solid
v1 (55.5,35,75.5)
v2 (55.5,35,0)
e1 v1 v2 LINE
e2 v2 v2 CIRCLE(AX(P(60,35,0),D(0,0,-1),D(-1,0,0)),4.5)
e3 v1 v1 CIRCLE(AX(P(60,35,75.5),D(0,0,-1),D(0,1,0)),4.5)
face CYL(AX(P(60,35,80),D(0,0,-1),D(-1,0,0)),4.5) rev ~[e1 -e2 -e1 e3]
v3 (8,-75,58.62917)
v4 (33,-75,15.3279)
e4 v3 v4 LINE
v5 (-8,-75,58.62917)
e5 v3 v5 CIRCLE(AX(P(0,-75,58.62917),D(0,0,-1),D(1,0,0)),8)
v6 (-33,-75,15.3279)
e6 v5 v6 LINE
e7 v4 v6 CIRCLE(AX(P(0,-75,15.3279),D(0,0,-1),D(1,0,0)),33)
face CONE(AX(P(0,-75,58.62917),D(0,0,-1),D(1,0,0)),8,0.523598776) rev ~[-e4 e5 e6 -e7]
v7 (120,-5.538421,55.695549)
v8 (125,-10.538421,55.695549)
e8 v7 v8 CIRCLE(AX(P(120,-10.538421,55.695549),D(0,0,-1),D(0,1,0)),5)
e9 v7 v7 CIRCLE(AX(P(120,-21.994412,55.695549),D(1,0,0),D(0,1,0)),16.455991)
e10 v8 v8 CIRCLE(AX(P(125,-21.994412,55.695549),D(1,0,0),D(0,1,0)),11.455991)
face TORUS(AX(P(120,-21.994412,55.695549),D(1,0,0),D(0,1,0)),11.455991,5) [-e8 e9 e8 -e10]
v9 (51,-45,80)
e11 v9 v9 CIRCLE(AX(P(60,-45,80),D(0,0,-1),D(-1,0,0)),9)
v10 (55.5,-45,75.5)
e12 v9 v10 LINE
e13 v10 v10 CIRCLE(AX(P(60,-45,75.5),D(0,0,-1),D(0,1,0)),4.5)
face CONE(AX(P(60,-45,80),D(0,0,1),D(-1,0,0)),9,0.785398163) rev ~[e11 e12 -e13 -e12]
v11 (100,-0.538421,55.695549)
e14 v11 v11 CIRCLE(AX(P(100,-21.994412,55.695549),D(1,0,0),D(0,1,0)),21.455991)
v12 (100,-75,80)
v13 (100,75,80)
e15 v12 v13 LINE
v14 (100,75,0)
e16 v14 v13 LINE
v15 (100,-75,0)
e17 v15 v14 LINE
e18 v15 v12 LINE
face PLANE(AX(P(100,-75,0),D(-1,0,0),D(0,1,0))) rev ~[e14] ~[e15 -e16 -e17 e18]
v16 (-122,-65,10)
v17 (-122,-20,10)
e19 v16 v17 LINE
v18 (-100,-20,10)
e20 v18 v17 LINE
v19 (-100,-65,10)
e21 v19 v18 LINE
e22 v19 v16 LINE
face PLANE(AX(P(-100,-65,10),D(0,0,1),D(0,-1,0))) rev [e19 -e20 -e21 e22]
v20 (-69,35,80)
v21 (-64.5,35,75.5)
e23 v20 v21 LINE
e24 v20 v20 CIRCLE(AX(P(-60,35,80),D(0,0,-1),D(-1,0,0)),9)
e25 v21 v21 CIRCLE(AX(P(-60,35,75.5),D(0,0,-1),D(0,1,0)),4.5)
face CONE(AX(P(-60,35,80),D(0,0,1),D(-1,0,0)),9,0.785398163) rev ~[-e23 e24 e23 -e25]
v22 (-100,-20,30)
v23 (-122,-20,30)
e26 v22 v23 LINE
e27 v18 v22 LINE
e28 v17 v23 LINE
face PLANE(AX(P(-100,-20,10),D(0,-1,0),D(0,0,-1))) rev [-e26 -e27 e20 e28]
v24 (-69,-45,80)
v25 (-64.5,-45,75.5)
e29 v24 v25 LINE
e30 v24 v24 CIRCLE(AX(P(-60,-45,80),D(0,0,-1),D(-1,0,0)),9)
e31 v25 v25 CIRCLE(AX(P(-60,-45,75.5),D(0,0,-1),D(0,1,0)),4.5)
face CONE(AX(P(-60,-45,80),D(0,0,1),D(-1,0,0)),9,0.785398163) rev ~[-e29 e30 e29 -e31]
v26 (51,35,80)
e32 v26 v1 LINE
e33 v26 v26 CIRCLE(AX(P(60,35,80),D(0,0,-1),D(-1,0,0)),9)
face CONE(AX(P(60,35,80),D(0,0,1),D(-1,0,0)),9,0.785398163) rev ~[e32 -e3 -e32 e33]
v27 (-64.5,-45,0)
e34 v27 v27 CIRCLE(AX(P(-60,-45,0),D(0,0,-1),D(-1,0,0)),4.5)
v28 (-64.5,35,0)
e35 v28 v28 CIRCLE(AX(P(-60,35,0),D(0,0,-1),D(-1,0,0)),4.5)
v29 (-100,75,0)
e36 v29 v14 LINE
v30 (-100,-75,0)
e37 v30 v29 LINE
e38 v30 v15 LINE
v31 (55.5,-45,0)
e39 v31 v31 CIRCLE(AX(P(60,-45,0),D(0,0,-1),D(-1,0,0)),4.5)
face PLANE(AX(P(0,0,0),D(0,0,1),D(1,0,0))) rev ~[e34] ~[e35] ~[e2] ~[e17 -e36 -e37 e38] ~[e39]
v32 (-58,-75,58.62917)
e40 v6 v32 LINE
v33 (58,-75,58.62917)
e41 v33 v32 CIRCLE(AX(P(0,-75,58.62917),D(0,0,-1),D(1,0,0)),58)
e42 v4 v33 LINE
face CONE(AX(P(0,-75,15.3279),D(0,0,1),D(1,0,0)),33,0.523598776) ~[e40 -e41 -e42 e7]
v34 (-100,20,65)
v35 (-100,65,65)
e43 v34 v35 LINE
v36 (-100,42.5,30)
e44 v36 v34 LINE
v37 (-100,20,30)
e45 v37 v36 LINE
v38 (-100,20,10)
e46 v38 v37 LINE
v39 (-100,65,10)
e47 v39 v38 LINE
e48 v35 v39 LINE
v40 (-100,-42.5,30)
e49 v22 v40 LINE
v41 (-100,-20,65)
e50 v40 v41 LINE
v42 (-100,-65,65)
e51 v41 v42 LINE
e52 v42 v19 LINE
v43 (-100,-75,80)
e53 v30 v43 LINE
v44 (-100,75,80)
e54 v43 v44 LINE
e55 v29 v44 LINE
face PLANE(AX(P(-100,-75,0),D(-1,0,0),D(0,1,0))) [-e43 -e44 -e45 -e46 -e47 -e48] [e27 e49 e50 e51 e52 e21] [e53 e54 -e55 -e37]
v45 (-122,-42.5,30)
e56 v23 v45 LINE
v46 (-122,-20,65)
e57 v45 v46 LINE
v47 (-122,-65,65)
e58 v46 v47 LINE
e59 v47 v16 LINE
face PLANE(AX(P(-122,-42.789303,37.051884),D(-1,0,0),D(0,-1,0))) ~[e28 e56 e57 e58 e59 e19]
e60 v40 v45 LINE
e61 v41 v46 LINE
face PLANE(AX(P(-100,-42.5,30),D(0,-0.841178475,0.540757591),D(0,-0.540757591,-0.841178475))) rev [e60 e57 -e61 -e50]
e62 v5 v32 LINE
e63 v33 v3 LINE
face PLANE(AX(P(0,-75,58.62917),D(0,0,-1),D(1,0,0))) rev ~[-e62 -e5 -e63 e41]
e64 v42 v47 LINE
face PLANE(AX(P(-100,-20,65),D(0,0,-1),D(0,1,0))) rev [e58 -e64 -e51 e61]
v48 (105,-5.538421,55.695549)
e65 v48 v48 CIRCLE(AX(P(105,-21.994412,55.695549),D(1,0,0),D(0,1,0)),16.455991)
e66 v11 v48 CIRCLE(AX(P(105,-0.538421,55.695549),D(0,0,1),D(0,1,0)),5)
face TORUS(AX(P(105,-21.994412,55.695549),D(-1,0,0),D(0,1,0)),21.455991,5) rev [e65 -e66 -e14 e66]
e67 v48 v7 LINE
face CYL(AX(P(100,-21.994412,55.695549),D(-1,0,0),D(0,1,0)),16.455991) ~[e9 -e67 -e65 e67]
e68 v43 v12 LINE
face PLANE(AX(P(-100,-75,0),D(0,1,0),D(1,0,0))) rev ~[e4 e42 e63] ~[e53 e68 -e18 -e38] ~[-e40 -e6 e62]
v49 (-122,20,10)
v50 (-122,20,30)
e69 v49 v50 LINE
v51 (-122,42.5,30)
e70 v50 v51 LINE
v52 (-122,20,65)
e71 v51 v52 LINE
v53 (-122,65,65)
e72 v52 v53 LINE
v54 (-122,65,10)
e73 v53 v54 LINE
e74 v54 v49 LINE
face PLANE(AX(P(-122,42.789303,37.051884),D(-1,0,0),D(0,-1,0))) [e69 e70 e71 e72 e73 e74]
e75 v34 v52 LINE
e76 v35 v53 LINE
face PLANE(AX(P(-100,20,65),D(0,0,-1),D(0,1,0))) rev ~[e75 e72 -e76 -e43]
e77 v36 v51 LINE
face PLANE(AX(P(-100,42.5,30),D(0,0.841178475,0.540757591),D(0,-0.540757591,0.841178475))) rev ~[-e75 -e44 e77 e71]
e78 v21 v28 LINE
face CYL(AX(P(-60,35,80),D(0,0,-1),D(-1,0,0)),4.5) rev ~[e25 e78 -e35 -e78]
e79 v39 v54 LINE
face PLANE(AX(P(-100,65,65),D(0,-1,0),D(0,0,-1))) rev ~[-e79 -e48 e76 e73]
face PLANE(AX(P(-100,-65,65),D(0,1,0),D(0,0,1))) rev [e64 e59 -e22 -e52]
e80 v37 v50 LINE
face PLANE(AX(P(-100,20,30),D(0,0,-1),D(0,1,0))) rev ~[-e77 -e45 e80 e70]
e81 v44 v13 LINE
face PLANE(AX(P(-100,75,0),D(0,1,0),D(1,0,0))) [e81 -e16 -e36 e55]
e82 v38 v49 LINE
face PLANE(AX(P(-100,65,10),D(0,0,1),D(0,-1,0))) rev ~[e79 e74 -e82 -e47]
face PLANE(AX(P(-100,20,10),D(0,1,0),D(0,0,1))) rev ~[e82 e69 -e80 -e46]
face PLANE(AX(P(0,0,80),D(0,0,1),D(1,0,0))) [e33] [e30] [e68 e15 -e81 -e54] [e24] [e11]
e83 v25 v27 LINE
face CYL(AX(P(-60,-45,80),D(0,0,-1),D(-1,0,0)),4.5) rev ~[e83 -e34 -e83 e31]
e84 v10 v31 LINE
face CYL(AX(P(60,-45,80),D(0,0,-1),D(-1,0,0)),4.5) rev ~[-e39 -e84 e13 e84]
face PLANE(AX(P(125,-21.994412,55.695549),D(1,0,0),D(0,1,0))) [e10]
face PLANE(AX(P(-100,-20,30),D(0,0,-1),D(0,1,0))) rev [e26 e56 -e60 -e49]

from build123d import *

# Parameters (mm, degrees)
F0_W            = 200
F0_H            = 150
F1_DEPTH        = 80
F13_D           = 9
F13_CSINK_D     = 18
F13_CSINK_ANGLE = 90
F2_R            = 16.4559911856
F3_DEPTH        = 60
F4_DEPTH        = 25
F14_R           = 5
F5_R            = 5
F11_DEPTH       = 22


# Not quite as in the source:
# - a pattern or mirror of a feature is missing from the dataset's text; its kind, count and spacing are read off the source's solid


with BuildPart() as f1:
    # F0 (on Top) → F1 (new body)
    with BuildSketch(Plane.XY):
        Rectangle(F0_W, F0_H)
    extrude(amount=F1_DEPTH)

    # F13 (through all)
    with Locations(Plane.XY.offset(80)):
        with Locations((-60, 35), (-60, -45), (60, 35), (60, -45)):
            CounterSinkHole(F13_D / 2, F13_CSINK_D / 2, counter_sink_angle=F13_CSINK_ANGLE)

    # F2 (on face) → F4 (join)
    with BuildSketch(Plane.YZ.offset(100)):
        with Locations((-21.9944119453, 55.6955486536)):
            Circle(F2_R)
    extrude(amount=F4_DEPTH)

    # F14
    f14_edges = [f1.edges().sort_by_distance(p)[0] for p in [
        (100, -38.450403, 55.695549),
        (125, -38.450403, 55.695549),
    ]]
    fillet(f14_edges, radius=F14_R)

    # F7 (on face) → F15 (revolve)
    with BuildSketch(Plane.XZ.offset(75)):
        Polygon((8, 58.6291704433), (33, 15.327900254), (58, 58.6291704433), align=None)
    revolve(axis=Axis((0, -75, 40), (0, 0, -1)))

    # F10 (on face) → F11 (join)
    with BuildSketch(Plane(origin=(-100, 0, 0), x_dir=(0, -1, 0), z_dir=(-1, 0, 0))):
        Polygon((-20, 65), (-65, 65), (-65, 10), (-20, 10), (-20, 30), (-42.5, 30), align=None)
    f11 = extrude(amount=F11_DEPTH)

    # F11_copies: F11 across plane
    add(f11.mirror(Plane(origin=(0, 0, 0), x_dir=(0, 0, -1), z_dir=(0, -1, 0))))


with BuildPart() as f3:
    # F2 (on face) → F3 (new body)
    with BuildSketch(Plane.YZ.offset(100)):
        with Locations((78.0055880547, 135.6955486536)):
            Circle(F2_R)
    extrude(amount=F3_DEPTH)

    # F5
    f5_edges = [f3.edges().sort_by_distance(p)[0] for p in [
        (160, 61.549597, 135.695549),
        (100, 61.549597, 135.695549),
    ]]
    fillet(f5_edges, radius=F5_R)


with BuildPart() as f6_1:
    # F6: instance of F3
    add(f3.part.mirror(Plane.YZ))


solid = f1.part
